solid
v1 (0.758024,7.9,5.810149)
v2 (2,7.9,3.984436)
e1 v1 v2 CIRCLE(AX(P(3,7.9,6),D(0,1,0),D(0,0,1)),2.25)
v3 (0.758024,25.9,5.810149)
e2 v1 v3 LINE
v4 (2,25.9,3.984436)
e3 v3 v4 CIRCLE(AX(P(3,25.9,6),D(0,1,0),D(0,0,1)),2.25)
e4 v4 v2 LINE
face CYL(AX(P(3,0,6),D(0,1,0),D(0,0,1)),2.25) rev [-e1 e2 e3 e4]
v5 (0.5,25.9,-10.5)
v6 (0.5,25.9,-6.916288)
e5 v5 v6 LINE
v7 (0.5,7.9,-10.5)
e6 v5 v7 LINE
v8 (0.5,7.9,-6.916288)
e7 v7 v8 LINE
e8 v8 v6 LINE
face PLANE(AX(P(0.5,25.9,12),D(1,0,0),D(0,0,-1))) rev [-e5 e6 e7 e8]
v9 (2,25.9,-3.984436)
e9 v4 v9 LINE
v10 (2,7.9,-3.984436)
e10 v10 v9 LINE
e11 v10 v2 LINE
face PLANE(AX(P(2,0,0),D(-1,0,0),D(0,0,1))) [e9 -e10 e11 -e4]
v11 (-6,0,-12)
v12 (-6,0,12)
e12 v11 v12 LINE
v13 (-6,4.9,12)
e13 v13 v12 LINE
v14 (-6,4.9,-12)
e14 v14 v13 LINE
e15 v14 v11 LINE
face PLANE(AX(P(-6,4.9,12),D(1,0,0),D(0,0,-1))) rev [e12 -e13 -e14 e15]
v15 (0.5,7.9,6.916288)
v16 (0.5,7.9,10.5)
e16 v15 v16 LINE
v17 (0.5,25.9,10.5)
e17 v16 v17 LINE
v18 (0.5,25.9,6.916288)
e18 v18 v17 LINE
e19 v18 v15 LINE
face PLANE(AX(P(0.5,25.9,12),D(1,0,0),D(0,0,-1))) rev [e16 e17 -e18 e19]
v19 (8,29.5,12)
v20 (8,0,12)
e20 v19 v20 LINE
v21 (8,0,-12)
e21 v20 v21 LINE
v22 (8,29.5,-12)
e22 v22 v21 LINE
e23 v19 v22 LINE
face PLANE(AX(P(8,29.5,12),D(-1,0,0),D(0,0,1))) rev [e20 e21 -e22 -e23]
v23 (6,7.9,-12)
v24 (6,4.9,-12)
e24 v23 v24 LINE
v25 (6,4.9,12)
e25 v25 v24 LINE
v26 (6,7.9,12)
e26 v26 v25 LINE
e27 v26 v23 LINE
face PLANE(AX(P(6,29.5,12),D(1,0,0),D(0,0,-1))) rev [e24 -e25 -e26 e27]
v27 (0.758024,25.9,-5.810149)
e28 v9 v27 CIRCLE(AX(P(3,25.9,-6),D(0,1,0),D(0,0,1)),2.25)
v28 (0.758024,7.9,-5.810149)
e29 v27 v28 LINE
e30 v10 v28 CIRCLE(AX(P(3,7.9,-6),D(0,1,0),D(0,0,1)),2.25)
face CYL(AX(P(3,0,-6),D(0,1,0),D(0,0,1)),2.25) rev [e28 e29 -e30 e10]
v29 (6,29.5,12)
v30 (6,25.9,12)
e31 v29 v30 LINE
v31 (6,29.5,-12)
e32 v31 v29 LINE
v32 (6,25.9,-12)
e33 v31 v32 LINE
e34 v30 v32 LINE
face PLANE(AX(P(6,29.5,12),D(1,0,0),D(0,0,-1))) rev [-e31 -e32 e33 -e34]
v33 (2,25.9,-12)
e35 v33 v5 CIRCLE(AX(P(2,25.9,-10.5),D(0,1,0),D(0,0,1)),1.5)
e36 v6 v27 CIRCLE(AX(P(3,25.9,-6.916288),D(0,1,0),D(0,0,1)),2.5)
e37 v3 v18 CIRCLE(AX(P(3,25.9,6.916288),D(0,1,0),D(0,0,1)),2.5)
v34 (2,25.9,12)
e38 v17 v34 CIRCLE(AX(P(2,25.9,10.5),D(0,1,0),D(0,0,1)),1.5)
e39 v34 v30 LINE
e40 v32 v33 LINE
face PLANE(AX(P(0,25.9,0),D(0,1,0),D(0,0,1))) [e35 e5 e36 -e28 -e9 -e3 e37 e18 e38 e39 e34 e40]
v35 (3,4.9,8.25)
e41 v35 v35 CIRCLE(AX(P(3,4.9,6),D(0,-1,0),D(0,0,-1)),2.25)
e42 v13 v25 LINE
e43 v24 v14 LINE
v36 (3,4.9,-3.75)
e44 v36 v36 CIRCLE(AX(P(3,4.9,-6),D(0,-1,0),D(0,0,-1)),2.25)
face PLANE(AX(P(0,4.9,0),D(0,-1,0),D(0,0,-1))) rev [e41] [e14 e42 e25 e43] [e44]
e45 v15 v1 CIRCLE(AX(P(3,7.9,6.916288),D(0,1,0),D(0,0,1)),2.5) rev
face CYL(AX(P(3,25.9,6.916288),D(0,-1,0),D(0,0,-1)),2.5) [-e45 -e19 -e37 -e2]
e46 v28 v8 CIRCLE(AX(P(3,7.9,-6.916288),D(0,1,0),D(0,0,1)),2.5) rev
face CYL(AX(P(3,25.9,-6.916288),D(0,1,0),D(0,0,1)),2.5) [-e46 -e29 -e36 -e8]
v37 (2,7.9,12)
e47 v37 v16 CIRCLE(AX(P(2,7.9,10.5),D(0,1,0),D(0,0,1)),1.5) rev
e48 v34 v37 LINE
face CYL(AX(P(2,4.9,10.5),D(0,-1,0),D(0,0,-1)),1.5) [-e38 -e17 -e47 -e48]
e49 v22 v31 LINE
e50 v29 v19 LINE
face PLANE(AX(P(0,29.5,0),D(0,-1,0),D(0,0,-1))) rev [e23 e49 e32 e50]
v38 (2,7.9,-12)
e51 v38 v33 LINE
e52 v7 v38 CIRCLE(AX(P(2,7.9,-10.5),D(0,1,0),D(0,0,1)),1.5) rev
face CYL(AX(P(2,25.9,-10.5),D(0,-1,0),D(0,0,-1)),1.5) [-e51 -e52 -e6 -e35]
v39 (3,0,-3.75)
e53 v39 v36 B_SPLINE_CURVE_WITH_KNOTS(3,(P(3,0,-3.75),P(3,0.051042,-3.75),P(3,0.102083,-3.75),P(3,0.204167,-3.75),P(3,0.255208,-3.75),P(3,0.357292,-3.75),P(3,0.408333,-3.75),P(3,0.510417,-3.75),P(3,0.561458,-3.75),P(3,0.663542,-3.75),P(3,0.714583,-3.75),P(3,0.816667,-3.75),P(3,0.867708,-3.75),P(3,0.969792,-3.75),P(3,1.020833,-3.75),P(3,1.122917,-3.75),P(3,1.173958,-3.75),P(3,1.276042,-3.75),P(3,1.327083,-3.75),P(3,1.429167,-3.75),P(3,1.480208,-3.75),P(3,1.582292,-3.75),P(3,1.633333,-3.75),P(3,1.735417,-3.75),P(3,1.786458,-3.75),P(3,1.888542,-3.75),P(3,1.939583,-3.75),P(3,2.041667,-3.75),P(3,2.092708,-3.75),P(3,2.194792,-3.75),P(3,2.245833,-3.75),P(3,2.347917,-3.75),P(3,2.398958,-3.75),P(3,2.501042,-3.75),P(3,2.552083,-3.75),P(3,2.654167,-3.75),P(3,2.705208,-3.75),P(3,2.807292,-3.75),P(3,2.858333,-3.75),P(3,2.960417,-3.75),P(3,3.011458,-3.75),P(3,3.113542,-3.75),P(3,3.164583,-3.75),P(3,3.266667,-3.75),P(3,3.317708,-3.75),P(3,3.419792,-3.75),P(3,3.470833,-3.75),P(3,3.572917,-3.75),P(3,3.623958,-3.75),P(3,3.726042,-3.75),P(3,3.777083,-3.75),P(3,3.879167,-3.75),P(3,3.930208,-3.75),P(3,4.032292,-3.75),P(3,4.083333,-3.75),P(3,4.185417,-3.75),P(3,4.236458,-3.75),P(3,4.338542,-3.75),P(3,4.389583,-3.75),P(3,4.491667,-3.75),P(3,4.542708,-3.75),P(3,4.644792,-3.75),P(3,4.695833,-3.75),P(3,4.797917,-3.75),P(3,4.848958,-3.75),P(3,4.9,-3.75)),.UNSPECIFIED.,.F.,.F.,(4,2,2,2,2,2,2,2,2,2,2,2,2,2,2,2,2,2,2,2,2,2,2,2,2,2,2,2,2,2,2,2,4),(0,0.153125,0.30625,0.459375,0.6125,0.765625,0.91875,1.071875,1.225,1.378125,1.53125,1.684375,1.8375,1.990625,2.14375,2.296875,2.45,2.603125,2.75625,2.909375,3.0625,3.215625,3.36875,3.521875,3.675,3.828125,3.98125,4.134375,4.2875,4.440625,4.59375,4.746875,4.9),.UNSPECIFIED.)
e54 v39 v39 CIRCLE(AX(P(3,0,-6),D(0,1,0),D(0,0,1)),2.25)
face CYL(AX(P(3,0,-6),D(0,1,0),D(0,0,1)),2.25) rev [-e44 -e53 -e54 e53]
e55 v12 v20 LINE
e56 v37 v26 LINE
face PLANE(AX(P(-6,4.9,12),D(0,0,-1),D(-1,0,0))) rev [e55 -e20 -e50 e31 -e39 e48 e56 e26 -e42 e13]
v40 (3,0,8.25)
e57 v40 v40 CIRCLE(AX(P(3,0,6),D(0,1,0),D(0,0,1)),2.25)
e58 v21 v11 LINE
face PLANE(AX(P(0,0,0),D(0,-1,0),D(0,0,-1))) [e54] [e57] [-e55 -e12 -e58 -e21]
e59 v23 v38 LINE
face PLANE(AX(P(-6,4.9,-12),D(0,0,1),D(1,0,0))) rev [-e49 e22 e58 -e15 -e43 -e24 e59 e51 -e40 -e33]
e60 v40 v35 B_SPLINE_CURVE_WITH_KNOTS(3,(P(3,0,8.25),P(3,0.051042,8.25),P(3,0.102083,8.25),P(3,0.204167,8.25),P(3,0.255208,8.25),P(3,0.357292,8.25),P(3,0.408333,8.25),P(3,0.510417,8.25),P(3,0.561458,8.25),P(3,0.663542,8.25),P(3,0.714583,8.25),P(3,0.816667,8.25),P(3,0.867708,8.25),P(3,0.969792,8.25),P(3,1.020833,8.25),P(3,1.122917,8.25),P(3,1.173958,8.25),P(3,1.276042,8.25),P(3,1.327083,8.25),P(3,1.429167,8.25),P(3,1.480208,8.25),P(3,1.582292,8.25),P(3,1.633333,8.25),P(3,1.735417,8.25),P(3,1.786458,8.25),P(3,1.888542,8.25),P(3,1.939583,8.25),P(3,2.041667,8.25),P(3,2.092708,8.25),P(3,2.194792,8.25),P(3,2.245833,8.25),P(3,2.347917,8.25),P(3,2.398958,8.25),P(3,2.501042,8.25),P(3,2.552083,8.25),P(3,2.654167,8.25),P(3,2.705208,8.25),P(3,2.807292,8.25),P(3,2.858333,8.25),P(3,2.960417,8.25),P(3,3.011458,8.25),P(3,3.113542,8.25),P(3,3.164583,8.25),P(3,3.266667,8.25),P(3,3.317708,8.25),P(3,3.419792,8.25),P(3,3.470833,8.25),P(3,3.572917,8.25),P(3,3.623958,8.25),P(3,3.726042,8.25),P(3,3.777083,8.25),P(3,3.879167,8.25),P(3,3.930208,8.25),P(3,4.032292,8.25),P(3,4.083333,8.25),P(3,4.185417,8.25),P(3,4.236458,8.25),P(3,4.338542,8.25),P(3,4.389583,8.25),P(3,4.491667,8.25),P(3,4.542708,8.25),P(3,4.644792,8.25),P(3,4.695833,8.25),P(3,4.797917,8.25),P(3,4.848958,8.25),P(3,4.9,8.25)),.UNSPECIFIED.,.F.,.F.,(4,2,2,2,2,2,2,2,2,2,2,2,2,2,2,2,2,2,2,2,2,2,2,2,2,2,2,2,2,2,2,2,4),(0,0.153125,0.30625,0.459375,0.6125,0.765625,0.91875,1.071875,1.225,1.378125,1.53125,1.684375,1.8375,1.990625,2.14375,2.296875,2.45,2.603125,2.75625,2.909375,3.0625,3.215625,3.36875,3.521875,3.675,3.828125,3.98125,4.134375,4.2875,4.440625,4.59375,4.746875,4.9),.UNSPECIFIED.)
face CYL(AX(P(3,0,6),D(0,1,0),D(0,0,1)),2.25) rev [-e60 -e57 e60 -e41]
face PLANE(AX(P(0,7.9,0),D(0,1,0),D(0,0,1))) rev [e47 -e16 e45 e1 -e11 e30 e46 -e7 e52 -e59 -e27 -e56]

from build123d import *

# Parameters (mm, degrees)
SKETCH1_W           = 12
SKETCH1_H           = 24
BOSS_EXTRUDE1_DEPTH = 4.9
SKETCH2_W           = 2
SKETCH2_H           = 24
BOSS_EXTRUDE2_DEPTH = 29.5
BOSS_EXTRUDE4_START = 3
SKETCH4_W           = 5.5
SKETCH4_H           = 24
BOSS_EXTRUDE4_DEPTH = 18
SKETCH5_W           = 9.25
SKETCH5_H           = 18
CUT_EXTRUDE1_DEPTH  = 1.5
FILLET1_R           = 2.5
SKETCH6_R           = 2.25
CUT_EXTRUDE2_DEPTH  = 30.644729717
FILLET2_R           = 1.5


with BuildPart() as part:
    # Sketch1 → Boss-Extrude1 (new body)
    with BuildSketch(Plane(origin=(0, 0, 0), x_dir=(1, 0, 0), z_dir=(0, 1, 0))):
        Rectangle(SKETCH1_W, SKETCH1_H)
    extrude(amount=BOSS_EXTRUDE1_DEPTH)

    # Sketch2 → Boss-Extrude2 (add)
    with BuildSketch(Plane(origin=(0, 0, 0), x_dir=(1, 0, 0), z_dir=(0, 1, 0))):
        with Locations((7, 0)):
            Rectangle(SKETCH2_W, SKETCH2_H)
    extrude(amount=BOSS_EXTRUDE2_DEPTH)

    # Sketch4 → Boss-Extrude4 (add)
    with BuildSketch(Plane(origin=(0, 4.9, 0), x_dir=(1, 0, 0), z_dir=(0, 1, 0)).offset(BOSS_EXTRUDE4_START)):
        with Locations((3.25, 0)):
            Rectangle(SKETCH4_W, SKETCH4_H)
    extrude(amount=BOSS_EXTRUDE4_DEPTH)

    # Sketch5 → Cut-Extrude1 (cut)
    with BuildSketch(Plane.ZY.offset(-0.5)):
        with Locations((0, 16.9)):
            Rectangle(SKETCH5_W, SKETCH5_H)
    extrude(amount=-CUT_EXTRUDE1_DEPTH, mode=Mode.SUBTRACT)

    # Fillet1
    # the kernel refuses this fillet: 2.5 mm, written as the material it takes off along each edge
    with BuildSketch(Plane(origin=(0.5, 31.628219619, 4.625), x_dir=(0, 0, 1), z_dir=(0, -1, 0)), Plane(origin=(0.5, 7.9, -4.625), x_dir=(0, 0, -1), z_dir=(0, 1, 0))) as fillet1_piece_1:
        with BuildLine():
            CenterArc((2.291287847, -2.5), FILLET1_R, 90, 66.421821522)
            Line((0, -1.5), (0, 0))
            Line((0, 0), (2.291287847, 0))
        make_face()
    extrude(amount=23.728219619, mode=Mode.SUBTRACT)

    # Sketch6 → Cut-Extrude2 (cut, through all)
    with BuildSketch(Plane(origin=(0, 25.9, 0), x_dir=(1, 0, 0), z_dir=(0, 1, 0))):
        with Locations(Location((3, -6, 0), (0, 0, 270))):
            Circle(SKETCH6_R)
        with Locations(Location((3, 6, 0), (0, 0, 270))):
            Circle(SKETCH6_R)
    extrude(amount=-CUT_EXTRUDE2_DEPTH, mode=Mode.SUBTRACT)

    # Fillet2
    fillet2_edges = [part.edges().sort_by_distance(p)[0] for p in [
        (0.5, 16.9, -12),
        (0.5, 16.9, 12),
    ]]
    fillet(fillet2_edges, radius=FILLET2_R)


solid = part.part
